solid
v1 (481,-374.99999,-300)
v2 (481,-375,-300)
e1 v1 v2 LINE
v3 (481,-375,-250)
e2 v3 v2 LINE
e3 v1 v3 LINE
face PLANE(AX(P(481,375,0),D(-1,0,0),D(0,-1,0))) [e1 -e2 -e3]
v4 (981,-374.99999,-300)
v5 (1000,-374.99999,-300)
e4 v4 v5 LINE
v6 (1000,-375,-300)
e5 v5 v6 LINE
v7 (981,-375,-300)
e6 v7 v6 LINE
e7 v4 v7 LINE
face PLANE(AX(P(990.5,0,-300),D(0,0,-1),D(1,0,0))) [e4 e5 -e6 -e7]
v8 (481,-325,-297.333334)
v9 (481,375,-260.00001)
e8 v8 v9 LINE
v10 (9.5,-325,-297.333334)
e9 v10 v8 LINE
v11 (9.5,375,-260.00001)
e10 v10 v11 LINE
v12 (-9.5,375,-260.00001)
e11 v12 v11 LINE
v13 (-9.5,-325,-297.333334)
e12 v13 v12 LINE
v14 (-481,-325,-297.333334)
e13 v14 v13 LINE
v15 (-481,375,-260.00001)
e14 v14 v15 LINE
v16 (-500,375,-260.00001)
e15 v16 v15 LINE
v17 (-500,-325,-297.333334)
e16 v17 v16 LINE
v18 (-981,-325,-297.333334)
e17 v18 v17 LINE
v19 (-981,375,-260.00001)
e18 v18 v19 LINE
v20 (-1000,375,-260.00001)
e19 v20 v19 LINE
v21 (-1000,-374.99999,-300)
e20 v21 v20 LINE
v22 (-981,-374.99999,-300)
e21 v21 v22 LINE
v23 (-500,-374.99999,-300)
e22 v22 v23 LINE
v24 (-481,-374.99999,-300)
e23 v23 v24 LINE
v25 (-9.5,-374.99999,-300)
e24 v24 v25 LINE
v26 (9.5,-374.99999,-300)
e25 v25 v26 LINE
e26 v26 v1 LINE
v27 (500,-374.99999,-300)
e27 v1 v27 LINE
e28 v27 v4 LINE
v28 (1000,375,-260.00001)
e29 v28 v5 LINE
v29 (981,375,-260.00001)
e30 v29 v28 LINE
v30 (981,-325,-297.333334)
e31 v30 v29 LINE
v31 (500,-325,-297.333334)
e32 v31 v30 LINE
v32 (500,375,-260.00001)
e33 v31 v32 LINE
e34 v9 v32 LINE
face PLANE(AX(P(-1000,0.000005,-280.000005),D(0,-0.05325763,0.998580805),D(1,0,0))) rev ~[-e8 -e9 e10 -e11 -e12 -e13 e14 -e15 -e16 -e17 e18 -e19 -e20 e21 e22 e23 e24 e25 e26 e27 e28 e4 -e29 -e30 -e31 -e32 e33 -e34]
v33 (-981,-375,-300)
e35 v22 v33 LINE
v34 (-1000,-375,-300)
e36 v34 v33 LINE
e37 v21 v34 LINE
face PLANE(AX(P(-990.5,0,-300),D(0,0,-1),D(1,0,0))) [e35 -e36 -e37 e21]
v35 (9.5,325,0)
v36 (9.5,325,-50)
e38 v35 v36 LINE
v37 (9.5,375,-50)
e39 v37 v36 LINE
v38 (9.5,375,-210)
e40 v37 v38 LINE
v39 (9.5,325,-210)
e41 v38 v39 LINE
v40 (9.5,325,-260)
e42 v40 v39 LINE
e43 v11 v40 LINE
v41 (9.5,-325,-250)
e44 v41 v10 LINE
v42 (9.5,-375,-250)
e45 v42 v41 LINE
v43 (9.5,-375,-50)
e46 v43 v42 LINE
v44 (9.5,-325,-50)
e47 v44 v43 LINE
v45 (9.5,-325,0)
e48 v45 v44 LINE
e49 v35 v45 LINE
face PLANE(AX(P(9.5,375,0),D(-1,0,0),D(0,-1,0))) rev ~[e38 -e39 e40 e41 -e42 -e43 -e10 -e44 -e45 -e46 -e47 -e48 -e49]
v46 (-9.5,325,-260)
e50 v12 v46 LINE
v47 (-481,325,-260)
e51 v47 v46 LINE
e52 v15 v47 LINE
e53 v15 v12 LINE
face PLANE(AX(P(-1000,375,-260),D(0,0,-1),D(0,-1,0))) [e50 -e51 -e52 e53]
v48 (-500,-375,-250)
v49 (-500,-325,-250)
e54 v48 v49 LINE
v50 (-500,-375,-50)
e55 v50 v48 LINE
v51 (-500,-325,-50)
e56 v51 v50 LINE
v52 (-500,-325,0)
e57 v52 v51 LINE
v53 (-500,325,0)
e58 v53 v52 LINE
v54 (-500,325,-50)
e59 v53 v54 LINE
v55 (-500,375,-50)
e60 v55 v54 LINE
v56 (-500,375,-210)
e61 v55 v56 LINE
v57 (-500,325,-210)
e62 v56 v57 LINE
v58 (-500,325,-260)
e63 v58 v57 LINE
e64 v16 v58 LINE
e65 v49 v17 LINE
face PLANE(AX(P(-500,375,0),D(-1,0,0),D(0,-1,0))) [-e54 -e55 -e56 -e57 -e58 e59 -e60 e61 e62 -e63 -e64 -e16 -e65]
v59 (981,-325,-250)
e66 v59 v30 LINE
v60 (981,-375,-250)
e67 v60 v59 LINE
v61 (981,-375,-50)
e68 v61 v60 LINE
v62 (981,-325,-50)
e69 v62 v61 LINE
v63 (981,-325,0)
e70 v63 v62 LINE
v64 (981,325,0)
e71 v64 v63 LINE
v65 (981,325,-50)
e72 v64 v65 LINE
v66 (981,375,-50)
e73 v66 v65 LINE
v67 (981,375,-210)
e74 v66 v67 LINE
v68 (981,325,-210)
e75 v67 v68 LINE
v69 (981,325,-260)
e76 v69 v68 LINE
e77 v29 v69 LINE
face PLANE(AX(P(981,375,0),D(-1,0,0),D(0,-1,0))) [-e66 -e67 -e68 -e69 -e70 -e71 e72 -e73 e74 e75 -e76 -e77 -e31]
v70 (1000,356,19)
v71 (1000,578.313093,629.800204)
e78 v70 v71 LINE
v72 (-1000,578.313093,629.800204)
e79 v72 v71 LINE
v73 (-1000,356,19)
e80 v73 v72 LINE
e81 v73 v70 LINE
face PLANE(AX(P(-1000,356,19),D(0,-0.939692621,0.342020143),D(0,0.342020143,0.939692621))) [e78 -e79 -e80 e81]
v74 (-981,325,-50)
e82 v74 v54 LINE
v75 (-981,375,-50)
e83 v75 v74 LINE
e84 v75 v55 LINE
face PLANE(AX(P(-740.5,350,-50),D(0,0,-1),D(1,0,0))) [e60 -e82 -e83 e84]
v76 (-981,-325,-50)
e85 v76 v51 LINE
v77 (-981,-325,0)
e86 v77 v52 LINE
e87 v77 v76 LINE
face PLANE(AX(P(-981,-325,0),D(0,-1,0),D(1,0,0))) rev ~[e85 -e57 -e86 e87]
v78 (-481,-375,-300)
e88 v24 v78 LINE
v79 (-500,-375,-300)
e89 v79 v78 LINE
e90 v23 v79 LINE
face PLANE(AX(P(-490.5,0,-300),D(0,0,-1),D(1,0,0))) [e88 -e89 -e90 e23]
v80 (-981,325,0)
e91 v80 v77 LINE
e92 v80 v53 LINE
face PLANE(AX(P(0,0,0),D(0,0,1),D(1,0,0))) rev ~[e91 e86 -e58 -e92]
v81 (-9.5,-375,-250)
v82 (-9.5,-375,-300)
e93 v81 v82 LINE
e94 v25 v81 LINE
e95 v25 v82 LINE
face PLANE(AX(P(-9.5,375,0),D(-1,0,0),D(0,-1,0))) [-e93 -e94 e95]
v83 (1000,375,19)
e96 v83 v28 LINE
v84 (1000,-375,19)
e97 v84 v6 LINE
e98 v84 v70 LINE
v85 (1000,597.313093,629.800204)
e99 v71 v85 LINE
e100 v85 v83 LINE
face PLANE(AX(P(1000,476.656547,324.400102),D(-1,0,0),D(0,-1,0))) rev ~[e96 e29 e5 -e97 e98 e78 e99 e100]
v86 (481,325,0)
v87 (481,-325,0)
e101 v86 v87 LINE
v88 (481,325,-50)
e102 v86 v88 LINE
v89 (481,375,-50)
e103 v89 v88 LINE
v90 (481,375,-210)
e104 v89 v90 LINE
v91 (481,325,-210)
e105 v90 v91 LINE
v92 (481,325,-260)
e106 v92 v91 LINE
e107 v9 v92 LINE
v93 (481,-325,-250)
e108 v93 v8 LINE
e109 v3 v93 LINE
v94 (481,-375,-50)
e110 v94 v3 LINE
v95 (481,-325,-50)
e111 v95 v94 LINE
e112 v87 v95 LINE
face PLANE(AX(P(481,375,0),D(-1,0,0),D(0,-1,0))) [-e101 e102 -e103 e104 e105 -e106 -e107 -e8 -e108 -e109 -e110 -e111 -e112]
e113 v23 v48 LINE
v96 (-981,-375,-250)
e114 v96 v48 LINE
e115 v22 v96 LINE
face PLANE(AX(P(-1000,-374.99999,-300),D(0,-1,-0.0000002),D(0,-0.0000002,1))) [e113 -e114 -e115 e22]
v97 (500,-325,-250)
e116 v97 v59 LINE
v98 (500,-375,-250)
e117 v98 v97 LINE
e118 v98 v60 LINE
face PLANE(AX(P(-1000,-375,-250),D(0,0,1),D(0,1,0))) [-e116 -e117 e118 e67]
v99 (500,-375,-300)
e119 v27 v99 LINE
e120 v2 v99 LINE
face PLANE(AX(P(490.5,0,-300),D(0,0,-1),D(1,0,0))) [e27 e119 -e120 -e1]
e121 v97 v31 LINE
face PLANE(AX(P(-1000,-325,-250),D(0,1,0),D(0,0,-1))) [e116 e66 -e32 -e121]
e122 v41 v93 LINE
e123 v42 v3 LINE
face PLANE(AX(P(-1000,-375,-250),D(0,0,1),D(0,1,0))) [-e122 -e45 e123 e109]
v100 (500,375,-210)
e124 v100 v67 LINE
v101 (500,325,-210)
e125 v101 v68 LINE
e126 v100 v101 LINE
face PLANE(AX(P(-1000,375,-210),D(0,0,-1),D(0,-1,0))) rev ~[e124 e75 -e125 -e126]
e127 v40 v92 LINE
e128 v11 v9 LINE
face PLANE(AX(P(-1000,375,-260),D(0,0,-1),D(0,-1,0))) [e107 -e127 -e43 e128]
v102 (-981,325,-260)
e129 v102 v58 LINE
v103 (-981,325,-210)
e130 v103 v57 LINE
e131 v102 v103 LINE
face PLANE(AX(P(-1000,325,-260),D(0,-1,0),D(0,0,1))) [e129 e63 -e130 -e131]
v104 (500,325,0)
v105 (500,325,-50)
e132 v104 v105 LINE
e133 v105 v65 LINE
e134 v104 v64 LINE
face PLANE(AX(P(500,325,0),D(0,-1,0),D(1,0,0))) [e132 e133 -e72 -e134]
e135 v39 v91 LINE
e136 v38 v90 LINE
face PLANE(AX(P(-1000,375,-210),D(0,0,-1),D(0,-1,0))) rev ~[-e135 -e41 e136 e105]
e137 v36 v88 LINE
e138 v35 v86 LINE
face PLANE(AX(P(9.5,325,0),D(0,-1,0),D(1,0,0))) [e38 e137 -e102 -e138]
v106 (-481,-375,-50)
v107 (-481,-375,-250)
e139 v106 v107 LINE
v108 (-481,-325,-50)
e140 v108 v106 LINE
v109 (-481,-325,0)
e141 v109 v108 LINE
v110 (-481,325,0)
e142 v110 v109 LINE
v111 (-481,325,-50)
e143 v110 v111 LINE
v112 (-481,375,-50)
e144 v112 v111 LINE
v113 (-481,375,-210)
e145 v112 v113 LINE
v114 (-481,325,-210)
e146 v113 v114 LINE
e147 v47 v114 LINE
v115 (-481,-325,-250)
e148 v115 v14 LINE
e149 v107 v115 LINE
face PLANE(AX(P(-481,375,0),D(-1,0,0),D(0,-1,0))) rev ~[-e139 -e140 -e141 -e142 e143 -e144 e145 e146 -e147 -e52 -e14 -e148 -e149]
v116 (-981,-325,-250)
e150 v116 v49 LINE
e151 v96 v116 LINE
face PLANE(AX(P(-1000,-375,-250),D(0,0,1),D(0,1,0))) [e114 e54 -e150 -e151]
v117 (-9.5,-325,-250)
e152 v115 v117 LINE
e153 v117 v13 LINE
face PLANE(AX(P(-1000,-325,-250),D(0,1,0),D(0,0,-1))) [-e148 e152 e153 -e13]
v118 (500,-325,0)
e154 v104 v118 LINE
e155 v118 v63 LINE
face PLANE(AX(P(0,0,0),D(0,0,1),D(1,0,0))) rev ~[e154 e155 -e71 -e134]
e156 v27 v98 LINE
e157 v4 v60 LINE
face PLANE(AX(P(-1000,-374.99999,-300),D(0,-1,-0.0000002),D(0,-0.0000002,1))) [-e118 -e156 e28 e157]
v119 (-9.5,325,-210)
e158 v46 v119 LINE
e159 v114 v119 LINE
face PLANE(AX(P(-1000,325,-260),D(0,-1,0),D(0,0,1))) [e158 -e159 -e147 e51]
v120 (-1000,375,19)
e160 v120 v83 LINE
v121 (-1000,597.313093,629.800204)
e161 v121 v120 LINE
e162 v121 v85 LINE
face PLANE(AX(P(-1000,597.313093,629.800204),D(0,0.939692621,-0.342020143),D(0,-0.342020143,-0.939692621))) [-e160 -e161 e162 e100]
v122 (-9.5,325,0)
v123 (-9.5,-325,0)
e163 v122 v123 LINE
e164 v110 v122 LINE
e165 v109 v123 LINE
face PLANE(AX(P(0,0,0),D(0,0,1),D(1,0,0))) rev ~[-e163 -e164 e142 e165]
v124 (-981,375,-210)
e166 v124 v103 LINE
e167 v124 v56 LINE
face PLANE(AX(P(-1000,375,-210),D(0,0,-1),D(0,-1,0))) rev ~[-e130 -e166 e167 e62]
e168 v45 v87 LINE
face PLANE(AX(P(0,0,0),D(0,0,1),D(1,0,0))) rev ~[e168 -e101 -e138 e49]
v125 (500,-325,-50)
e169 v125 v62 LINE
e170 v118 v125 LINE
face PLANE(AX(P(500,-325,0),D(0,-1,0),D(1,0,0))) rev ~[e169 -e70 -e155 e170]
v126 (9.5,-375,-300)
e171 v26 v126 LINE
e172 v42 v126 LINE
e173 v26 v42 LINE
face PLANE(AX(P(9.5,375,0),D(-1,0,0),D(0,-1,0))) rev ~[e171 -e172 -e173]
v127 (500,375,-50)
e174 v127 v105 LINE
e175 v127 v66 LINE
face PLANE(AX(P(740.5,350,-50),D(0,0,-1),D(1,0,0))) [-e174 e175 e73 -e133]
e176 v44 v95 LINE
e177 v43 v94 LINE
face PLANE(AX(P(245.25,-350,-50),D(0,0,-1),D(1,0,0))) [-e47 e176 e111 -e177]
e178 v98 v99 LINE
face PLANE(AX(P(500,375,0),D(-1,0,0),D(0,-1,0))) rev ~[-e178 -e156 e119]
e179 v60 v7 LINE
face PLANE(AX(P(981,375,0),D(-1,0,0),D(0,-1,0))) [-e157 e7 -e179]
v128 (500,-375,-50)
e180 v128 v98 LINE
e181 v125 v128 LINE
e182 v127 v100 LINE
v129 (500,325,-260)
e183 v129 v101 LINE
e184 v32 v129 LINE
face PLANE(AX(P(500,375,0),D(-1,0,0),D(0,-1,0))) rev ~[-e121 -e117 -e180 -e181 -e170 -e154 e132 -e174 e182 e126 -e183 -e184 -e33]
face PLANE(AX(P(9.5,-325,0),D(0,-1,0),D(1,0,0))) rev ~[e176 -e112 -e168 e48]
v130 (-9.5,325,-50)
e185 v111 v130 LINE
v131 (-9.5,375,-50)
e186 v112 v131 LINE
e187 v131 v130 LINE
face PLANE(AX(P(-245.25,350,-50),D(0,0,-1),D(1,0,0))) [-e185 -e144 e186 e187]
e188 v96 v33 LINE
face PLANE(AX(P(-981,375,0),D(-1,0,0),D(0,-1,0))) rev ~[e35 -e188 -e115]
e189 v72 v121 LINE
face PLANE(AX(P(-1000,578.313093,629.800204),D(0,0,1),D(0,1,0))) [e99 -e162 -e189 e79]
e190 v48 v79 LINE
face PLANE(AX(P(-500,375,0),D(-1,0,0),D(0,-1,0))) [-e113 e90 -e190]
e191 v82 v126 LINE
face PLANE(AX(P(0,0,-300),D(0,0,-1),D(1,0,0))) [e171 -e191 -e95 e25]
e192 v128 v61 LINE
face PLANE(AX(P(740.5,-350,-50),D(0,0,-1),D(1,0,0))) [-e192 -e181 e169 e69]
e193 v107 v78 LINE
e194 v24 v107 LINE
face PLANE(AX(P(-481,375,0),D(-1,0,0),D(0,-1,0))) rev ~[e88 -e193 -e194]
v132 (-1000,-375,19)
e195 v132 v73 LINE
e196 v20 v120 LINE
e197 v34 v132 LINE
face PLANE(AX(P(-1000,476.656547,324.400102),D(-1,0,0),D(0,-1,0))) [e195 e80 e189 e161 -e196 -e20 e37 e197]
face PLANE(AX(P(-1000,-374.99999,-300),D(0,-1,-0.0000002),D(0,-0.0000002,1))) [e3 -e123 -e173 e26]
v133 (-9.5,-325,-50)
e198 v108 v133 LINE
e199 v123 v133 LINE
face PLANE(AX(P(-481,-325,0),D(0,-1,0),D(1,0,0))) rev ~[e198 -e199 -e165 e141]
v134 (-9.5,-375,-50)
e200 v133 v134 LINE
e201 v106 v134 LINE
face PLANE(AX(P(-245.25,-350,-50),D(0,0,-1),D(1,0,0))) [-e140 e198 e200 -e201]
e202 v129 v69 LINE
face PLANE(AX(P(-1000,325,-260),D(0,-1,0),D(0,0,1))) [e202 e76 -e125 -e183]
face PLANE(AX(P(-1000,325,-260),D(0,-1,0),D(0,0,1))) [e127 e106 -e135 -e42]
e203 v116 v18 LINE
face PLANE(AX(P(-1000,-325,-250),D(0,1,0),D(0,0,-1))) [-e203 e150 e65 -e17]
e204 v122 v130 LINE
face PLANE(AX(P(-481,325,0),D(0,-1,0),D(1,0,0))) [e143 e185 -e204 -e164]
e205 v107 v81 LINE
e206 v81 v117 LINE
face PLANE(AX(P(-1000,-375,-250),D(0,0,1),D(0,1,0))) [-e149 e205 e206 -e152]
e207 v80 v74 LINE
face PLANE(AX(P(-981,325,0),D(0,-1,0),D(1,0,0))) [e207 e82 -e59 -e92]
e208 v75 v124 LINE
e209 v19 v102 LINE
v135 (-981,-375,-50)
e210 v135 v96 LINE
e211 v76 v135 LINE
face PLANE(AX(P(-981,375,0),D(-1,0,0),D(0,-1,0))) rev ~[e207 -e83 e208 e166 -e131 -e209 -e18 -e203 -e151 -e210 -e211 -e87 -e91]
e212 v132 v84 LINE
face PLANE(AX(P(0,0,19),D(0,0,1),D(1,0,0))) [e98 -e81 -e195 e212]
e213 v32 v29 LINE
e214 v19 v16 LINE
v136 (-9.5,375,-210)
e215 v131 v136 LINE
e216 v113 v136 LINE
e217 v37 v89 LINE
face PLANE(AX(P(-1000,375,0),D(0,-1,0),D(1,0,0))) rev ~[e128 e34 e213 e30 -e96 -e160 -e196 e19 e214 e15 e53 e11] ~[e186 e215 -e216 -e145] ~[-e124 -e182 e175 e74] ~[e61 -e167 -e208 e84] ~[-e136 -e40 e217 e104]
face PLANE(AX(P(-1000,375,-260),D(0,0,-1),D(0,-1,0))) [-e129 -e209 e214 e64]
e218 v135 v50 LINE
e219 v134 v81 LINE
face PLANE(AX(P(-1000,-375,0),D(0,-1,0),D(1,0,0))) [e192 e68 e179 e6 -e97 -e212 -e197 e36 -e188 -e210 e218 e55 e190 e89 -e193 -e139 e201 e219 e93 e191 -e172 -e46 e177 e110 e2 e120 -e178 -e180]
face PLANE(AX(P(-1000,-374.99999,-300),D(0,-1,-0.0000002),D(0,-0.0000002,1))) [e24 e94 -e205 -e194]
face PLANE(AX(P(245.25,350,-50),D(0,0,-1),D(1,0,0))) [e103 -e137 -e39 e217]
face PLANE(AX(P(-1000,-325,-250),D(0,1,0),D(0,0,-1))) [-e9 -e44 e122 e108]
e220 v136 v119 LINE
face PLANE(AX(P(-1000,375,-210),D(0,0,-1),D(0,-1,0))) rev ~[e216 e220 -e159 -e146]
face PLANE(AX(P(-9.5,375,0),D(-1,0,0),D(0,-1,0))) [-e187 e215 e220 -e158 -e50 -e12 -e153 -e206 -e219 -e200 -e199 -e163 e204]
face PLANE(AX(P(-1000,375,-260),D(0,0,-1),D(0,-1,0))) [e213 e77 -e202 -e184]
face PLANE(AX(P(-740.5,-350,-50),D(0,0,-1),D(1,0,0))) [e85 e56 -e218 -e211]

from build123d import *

# Parameters (mm, degrees)
F0_W       = 2000
F0_H       = 750
F1_DEPTH   = 19
F2_W       = 19
F2_H       = 750
F3_DEPTH   = 300
F4_SIZE2   = 39.99999
F4_SIZE    = 749.99999
F4_2_SIZE2 = 39.99999
F4_2_SIZE  = 749.99999
F4_3_SIZE2 = 39.99999
F4_3_SIZE  = 749.99999
F4_4_SIZE2 = 39.99999
F4_4_SIZE  = 749.99999
F4_5_SIZE2 = 39.99999
F4_5_SIZE  = 749.99999
F6_DEPTH   = 2000
F10_W      = 481
F10_H      = 50
F9_W       = 471.5
F9_H       = 50
F8_W       = 471.5
F8_H       = 50
F7_W       = 481
F7_H       = 50
F11_DEPTH  = 50
F12_W      = 50
F12_H      = 50
F13_DEPTH  = 2000


# Not quite as in the source:
# - a fillet or chamfer is up to 0.001 mm smaller than in the source, because OpenCascade refuses the exact size
# - ends of sketch curves that miss each other by under 0.0002 mm in the source are joined


with BuildPart() as f1:
    # F0 (on Top) → F1 (new body)
    with BuildSketch(Plane.XY):
        Rectangle(F0_W, F0_H)
    extrude(amount=F1_DEPTH)

    # F2 (on face) → F3 (join)
    with BuildSketch(Plane(origin=(0, 0, 0), x_dir=(1, 0, 0), z_dir=(0, 0, -1))):
        with Locations((-990.5, 0)):
            Rectangle(F2_W, F2_H)
        with Locations((-490.5, 0)):
            Rectangle(F2_W, F2_H)
        Rectangle(F2_W, F2_H)
        with Locations((490.5, 0)):
            Rectangle(F2_W, F2_H)
        with Locations((990.5, 0)):
            Rectangle(F2_W, F2_H)
    extrude(amount=F3_DEPTH)

    # F4 (size 750 and 40 in the source; OpenCascade refuses exactly that, so slightly less here)
    f4_edges = [f1.edges().sort_by_distance(p)[0] for p in [
        (990.5, 375, -300),
    ]]
    f4_side = f1.faces().sort_by_distance((990.5, 0, -300))[0]
    chamfer(f4_edges, length=F4_SIZE, length2=F4_SIZE2, reference=f4_side)

    # F4#2 (size 750 and 40 in the source; OpenCascade refuses exactly that, so slightly less here)
    f4_2_edges = [f1.edges().sort_by_distance(p)[0] for p in [
        (490.5, 375, -300),
    ]]
    f4_2_side = f1.faces().sort_by_distance((490.5, 0, -300))[0]
    chamfer(f4_2_edges, length=F4_2_SIZE, length2=F4_2_SIZE2, reference=f4_2_side)

    # F4#3 (size 750 and 40 in the source; OpenCascade refuses exactly that, so slightly less here)
    f4_3_edges = [f1.edges().sort_by_distance(p)[0] for p in [
        (0, 375, -300),
    ]]
    f4_3_side = f1.faces().sort_by_distance((0, 0, -300))[0]
    chamfer(f4_3_edges, length=F4_3_SIZE, length2=F4_3_SIZE2, reference=f4_3_side)

    # F4#4 (size 750 and 40 in the source; OpenCascade refuses exactly that, so slightly less here)
    f4_4_edges = [f1.edges().sort_by_distance(p)[0] for p in [
        (-490.5, 375, -300),
    ]]
    f4_4_side = f1.faces().sort_by_distance((-490.5, 0, -300))[0]
    chamfer(f4_4_edges, length=F4_4_SIZE, length2=F4_4_SIZE2, reference=f4_4_side)

    # F4#5 (size 750 and 40 in the source; OpenCascade refuses exactly that, so slightly less here)
    f4_5_edges = [f1.edges().sort_by_distance(p)[0] for p in [
        (-990.5, 375, -300),
    ]]
    f4_5_side = f1.faces().sort_by_distance((-990.5, 0, -300))[0]
    chamfer(f4_5_edges, length=F4_5_SIZE, length2=F4_5_SIZE2, reference=f4_5_side)

    # F5 (on face) → F6 (join)
    with BuildSketch(Plane(origin=(-1000, 0, 0), x_dir=(0, -1, 0), z_dir=(-1, 0, 0))):
        Polygon((-597.3130931617, 629.8002035108), (-375, 19), (-356, 19), (-578.3130931617, 629.8002035108), align=None)
    extrude(amount=-F6_DEPTH)

    # F10 (on face) + F9 (on face) + F8 (on face) + F7 (on face) → F11 (join)
    with BuildSketch(Plane(origin=(0, 0, 0), x_dir=(1, 0, 0), z_dir=(0, 0, -1))):
        with Locations((-740.5, 350)):
            Rectangle(F10_W, F10_H)
        with Locations((-740.5, -350)):
            Rectangle(F10_W, F10_H)
    with BuildSketch(Plane(origin=(0, 0, 0), x_dir=(1, 0, 0), z_dir=(0, 0, -1))):
        with Locations((-245.25, -350)):
            Rectangle(F9_W, F9_H)
        with Locations((-245.25, 350)):
            Rectangle(F9_W, F9_H)
    with BuildSketch(Plane(origin=(0, 0, 0), x_dir=(1, 0, 0), z_dir=(0, 0, -1))):
        with Locations((245.25, 350)):
            Rectangle(F8_W, F8_H)
        with Locations((245.25, -350)):
            Rectangle(F8_W, F8_H)
    with BuildSketch(Plane(origin=(0, 0, 0), x_dir=(1, 0, 0), z_dir=(0, 0, -1))):
        with Locations((740.5, 350)):
            Rectangle(F7_W, F7_H)
        with Locations((740.5, -350)):
            Rectangle(F7_W, F7_H)
    extrude(amount=F11_DEPTH)

    # F12 (on face) → F13 (join)
    with BuildSketch(Plane(origin=(-1000, 0, 0), x_dir=(0, -1, 0), z_dir=(-1, 0, 0))):
        with Locations((-350, -235)):
            Rectangle(F12_W, F12_H)
        Polygon((325, -250), (325, -297.3333344978), (374.99999, -300), (375, -250), align=None)
    extrude(amount=-F13_DEPTH)


solid = f1.part
